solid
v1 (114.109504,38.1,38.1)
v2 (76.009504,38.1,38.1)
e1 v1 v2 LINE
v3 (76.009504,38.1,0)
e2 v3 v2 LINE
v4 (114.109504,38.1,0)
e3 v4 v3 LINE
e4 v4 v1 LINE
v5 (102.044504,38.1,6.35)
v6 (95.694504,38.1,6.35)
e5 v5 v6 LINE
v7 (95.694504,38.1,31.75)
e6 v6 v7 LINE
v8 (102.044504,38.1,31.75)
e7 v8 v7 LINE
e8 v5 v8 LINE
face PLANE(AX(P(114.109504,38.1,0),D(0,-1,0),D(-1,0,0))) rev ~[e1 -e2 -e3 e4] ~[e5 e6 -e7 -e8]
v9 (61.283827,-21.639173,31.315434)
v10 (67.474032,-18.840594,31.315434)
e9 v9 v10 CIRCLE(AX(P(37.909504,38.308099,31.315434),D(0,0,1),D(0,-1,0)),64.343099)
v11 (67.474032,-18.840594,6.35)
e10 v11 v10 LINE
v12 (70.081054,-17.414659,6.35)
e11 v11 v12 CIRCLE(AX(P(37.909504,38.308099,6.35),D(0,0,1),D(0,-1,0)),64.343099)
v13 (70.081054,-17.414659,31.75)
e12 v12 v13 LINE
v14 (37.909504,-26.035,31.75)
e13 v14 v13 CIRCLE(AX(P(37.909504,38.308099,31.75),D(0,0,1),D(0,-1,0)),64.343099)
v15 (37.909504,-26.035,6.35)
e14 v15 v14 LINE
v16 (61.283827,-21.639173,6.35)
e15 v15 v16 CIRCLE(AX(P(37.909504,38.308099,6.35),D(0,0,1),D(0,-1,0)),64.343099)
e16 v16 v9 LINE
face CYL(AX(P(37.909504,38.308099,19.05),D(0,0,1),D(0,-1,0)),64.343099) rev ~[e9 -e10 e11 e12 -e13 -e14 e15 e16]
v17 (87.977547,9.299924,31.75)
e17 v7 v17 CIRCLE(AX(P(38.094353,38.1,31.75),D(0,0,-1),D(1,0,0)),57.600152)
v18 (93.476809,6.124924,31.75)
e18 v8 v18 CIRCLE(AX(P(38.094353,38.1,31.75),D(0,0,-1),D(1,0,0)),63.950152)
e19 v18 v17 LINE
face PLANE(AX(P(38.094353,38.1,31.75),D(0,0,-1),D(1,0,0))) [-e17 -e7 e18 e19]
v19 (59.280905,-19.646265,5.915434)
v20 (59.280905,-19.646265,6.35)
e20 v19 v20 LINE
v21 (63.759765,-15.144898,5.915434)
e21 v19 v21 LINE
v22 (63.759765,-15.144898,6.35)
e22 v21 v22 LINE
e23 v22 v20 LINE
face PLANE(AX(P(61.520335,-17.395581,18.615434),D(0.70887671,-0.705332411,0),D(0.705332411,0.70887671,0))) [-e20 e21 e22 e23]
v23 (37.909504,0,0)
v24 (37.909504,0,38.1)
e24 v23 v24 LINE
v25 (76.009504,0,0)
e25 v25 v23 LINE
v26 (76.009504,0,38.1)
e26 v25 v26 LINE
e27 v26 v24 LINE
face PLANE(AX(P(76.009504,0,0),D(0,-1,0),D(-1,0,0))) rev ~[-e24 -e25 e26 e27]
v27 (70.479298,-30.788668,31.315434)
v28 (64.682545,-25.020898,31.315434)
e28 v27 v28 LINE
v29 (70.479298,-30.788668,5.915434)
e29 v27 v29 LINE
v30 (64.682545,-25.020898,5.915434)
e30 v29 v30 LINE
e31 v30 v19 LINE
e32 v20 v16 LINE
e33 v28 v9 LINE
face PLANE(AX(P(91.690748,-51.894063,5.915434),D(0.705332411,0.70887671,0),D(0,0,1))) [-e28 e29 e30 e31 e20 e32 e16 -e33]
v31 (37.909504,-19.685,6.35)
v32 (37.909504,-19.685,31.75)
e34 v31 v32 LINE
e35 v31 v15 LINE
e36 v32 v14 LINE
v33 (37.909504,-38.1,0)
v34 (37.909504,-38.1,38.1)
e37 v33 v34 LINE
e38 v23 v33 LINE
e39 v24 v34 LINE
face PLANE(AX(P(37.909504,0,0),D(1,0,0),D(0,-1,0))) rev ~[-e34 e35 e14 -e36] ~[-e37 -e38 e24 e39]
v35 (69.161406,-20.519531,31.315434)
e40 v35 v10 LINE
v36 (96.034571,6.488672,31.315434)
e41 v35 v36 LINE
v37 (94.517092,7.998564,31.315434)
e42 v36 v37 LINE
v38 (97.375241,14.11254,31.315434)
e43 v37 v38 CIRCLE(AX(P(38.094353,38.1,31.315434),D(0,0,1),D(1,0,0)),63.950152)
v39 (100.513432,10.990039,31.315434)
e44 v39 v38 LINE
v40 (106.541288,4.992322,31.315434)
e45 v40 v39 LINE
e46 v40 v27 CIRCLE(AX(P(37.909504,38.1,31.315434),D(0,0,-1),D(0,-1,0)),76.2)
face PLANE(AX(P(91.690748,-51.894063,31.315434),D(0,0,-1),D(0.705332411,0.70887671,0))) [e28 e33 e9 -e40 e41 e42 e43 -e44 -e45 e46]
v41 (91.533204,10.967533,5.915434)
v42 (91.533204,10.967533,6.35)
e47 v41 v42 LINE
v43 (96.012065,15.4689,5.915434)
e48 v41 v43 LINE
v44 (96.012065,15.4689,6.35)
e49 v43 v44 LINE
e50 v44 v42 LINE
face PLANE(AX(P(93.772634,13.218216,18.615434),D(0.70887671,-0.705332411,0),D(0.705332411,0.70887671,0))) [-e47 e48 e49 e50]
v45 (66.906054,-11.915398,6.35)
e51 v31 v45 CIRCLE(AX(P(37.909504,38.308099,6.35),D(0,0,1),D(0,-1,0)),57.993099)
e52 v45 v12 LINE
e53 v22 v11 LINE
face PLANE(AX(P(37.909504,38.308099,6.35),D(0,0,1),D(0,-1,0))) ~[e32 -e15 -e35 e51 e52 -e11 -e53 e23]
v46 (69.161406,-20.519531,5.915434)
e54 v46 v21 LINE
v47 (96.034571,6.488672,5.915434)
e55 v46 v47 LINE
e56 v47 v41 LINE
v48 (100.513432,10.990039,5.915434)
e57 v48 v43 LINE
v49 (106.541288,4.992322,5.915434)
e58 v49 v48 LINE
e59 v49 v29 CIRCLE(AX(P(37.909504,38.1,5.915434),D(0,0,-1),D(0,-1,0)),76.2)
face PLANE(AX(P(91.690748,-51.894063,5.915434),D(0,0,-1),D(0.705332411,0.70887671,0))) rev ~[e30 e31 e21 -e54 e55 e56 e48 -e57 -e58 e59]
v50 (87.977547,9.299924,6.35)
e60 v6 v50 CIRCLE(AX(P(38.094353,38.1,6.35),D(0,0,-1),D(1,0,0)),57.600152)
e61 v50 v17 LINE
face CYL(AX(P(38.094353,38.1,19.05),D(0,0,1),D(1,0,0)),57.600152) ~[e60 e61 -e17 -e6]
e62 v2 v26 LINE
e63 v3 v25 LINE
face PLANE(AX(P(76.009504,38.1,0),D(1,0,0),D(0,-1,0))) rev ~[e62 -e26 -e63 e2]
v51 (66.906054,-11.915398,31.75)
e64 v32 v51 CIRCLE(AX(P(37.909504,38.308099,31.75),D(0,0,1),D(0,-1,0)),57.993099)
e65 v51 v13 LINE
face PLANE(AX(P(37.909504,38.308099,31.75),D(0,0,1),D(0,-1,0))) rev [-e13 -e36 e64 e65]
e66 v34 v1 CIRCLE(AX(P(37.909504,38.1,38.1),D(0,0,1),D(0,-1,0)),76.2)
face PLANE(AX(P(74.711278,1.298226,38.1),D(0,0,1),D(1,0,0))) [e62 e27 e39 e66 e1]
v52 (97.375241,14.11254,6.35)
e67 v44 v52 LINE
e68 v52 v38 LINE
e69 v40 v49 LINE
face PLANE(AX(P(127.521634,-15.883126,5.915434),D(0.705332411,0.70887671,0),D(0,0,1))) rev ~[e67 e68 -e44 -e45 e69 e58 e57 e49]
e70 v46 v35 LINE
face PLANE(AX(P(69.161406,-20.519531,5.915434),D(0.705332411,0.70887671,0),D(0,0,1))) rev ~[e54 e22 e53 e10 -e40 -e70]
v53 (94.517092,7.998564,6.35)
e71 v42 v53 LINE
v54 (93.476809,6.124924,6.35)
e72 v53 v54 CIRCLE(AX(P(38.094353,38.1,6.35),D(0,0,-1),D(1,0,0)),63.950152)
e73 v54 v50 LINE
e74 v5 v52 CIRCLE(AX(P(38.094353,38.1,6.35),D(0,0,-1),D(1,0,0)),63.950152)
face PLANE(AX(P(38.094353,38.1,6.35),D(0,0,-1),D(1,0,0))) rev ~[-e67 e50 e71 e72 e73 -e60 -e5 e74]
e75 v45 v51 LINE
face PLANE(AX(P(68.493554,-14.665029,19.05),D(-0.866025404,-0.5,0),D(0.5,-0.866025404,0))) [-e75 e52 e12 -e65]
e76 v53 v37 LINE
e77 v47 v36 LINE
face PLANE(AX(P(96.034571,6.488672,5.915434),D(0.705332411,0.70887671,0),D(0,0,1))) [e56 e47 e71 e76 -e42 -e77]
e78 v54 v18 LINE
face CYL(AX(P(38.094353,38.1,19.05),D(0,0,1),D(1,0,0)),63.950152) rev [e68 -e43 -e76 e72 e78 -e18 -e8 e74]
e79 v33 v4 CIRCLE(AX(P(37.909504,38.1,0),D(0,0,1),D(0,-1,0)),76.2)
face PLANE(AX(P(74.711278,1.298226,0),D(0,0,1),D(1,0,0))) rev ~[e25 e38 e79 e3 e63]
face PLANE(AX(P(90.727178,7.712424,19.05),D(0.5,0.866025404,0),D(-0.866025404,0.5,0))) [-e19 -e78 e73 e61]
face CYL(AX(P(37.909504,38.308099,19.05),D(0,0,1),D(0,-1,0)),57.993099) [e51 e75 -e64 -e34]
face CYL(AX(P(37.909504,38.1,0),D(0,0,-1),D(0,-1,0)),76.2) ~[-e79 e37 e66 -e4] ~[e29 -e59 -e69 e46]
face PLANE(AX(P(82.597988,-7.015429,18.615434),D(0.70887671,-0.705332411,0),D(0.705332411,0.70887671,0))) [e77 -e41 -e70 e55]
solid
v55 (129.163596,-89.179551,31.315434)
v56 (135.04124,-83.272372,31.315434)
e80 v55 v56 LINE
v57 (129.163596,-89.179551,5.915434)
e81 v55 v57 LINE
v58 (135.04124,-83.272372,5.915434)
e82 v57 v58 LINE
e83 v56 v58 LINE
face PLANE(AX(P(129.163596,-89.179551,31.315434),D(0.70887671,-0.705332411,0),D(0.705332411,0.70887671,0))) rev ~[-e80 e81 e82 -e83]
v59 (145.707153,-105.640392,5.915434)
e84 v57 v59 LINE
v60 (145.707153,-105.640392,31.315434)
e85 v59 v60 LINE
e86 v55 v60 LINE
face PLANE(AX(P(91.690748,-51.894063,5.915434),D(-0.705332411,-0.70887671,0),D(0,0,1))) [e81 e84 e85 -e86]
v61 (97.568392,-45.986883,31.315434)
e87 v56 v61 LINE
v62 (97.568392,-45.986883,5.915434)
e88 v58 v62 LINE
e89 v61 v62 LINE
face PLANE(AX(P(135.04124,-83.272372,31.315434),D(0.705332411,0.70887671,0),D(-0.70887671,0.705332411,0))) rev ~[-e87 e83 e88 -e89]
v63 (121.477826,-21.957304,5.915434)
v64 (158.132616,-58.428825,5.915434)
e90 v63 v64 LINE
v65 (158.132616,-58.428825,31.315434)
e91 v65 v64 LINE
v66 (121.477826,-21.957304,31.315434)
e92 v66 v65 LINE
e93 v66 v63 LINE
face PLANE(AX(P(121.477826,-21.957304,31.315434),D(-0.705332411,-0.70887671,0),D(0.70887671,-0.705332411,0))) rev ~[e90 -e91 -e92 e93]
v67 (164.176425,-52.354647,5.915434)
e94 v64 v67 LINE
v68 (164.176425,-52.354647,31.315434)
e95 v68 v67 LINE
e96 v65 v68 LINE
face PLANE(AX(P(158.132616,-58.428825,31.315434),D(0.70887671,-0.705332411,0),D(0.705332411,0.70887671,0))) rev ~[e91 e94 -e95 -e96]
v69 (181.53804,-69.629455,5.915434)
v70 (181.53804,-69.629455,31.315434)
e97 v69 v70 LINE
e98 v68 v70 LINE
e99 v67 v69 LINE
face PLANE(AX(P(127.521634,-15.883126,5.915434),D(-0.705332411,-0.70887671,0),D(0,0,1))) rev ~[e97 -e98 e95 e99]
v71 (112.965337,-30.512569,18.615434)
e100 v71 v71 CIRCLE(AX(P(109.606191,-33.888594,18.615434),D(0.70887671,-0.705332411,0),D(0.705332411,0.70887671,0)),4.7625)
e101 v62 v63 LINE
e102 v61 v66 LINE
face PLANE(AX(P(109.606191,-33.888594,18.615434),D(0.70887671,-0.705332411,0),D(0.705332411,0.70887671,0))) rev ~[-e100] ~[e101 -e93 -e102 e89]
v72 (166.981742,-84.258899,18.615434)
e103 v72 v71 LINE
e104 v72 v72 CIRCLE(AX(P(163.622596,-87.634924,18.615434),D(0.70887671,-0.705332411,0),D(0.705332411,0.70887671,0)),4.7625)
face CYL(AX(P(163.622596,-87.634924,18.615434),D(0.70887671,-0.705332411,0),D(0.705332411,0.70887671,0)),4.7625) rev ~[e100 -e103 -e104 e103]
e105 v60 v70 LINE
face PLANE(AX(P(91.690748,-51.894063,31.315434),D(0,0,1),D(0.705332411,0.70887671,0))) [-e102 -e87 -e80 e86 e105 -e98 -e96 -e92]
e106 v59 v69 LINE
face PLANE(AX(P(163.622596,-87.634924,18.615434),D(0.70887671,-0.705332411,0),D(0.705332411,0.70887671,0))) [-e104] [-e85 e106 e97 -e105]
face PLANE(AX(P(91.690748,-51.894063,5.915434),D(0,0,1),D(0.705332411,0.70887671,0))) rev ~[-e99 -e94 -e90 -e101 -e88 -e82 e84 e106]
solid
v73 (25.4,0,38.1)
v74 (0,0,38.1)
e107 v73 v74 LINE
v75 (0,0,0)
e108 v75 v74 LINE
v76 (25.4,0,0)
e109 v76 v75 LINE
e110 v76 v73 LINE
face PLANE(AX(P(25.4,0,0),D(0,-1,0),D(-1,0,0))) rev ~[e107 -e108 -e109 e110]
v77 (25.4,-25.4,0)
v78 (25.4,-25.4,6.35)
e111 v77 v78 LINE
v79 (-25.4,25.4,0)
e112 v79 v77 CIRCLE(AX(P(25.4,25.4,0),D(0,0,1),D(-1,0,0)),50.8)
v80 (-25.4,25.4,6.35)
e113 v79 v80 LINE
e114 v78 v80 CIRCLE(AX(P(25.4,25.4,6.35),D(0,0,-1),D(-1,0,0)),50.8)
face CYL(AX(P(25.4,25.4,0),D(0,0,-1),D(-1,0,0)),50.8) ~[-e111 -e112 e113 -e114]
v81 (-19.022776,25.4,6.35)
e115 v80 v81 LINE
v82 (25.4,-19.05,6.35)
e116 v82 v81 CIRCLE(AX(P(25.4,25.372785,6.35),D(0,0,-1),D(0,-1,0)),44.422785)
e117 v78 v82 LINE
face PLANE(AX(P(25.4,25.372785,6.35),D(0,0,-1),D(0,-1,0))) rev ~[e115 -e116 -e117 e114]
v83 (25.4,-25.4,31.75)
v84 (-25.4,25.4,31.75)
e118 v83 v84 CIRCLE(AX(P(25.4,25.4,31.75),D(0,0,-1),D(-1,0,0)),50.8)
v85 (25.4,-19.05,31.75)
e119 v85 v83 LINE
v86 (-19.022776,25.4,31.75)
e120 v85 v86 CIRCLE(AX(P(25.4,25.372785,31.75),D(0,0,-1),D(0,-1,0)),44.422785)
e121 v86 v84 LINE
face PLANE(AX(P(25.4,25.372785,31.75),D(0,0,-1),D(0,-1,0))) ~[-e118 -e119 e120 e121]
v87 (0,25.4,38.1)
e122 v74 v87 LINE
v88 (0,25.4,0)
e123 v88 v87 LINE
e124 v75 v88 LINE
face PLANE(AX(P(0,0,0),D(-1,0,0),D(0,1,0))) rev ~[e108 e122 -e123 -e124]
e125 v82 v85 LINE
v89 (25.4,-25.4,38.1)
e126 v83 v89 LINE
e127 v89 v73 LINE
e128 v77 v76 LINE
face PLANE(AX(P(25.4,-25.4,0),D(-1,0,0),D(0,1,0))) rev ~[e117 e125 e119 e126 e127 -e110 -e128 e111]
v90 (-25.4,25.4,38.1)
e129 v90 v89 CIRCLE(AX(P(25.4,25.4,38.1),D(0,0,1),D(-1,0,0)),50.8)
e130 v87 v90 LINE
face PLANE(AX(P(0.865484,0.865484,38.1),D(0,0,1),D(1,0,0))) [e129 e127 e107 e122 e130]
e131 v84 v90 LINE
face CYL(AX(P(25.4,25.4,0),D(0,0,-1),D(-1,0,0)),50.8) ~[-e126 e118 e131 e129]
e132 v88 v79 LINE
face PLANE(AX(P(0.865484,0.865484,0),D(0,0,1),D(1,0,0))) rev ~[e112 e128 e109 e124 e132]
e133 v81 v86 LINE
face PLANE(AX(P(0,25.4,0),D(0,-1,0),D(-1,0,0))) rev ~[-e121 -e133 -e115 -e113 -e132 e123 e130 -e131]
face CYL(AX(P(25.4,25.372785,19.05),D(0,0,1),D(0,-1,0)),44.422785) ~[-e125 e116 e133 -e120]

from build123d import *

# Parameters (mm, degrees)
F1_DEPTH  = 38.1
F2_W      = 6.35
F2_H      = 25.4
F3_ANGLE  = 91
F5_DEPTH  = 38.1
F6_W      = 6.35
F6_H      = 25.4
F7_ANGLE  = 30
F11_W     = 50.8
F11_H     = 25.4
F12_DEPTH = 38.1
F8_W      = 6.35
F8_H      = 25.4
F13_ANGLE = 30
F14_W     = 6.35
F14_H     = 25.4
F15_DEPTH = 7.62
F16_W     = 6.35
F16_H     = 25.4
F17_DEPTH = 6.35
F18_DEPTH = 76.2
F19_R     = 4.7625
F20_DEPTH = 76.2
F22_DEPTH = 25.4


# Not quite as in the source:
# - a feature names something its author has since deleted; it is built from what else it names


with BuildPart() as f1:
    # F0 (on Top) → F1 (new body)
    with BuildSketch(Plane.XY):
        with BuildLine():
            Line((0, 25.4), (-25.4, 25.4))
            ThreePointArc((-25.4, 25.4), (-10.5210244843, -10.5210244843), (25.4, -25.4))
            Line((25.4, -25.4), (25.4, 0))
            Line((25.4, 0), (0, 0))
            Line((0, 0), (0, 25.4))
        make_face()
    extrude(amount=F1_DEPTH)

    # F2 (on face) → F3 (revolve, cut)
    with BuildSketch(Plane.YZ.offset(25.4)):
        with Locations((-28.575, 19.05)):
            Rectangle(F2_W, F2_H)
        with Locations((-22.225, 19.05)):
            Rectangle(F2_W, F2_H)
    revolve(axis=Axis((25.4, 25.3727845848, 25.4265852273), (0, 0, -1)), revolution_arc=F3_ANGLE, mode=Mode.SUBTRACT)


with BuildPart() as f5:
    # F4 (on Top) → F5 (new body)
    with BuildSketch(Plane.XY):
        with BuildLine():
            Line((114.1095044971, 38.1), (76.0095044971, 38.1))
            Line((76.0095044971, 38.1), (76.0095044971, 0))
            Line((76.0095044971, 0), (37.9095044971, 0))
            Line((37.9095044971, 0), (37.9095044971, -38.1))
            ThreePointArc((37.9095044971, -38.1), (91.7910412235, -15.7815367264), (114.1095044971, 38.1))
        make_face()
    extrude(amount=F5_DEPTH)

    # F6 (on face) → F7 (revolve, cut)
    with BuildSketch(Plane(origin=(37.9095044971, 0, 0), x_dir=(0, -1, 0), z_dir=(-1, 0, 0))):
        with Locations((22.86, 19.05)):
            Rectangle(F6_W, F6_H)
    revolve(axis=Axis((37.9095044971, 38.3080989122, 33.1992767751), (0, 0, 1)), revolution_arc=F7_ANGLE, mode=Mode.SUBTRACT)

    # F11 (on face) → F12 (cut)
    with BuildSketch(Plane(origin=(72.0218737811, -71.6617729132, 0), x_dir=(0.7053324106, 0.7088767104, 0), z_dir=(0.7088767104, -0.7053324106, 0))):
        with Locations((53.2859638333, 18.6154339463)):
            Rectangle(F11_W, F11_H)
    extrude(amount=-F12_DEPTH, mode=Mode.SUBTRACT)

    # F8 (on face) → F13 (revolve, cut)
    with BuildSketch(Plane(origin=(0, 38.1, 0), x_dir=(-1, 0, 0), z_dir=(0, 1, 0))):
        with Locations((-98.8695044971, 19.05)):
            Rectangle(F8_W, F8_H)
    revolve(axis=Axis((38.0943529308, 38.1, 28.2714888453), (0, 0, -1)), revolution_arc=F13_ANGLE, mode=Mode.SUBTRACT)

    # F14 (on face) → F15 (cut)
    with BuildSketch(Plane(origin=(45.0136711132, -44.7886080707, 0), x_dir=(0.7053324106, 0.7088767104, 0), z_dir=(0.7088767104, -0.7053324106, 0))):
        with Locations((31.0609638333, 18.6154339463)):
            Rectangle(F14_W, F14_H)
    extrude(amount=-F15_DEPTH, mode=Mode.SUBTRACT)

    # F16 (on face) → F17 (cut)
    with BuildSketch(Plane(origin=(45.0136711132, -44.7886080707, 0), x_dir=(0.7053324106, 0.7088767104, 0), z_dir=(0.7088767104, -0.7053324106, 0))):
        with Locations((75.5109638333, 18.6154339463)):
            Rectangle(F16_W, F16_H)
    extrude(amount=-F17_DEPTH, mode=Mode.SUBTRACT)


with BuildPart() as f18:
    # F11 (on face) → F18 (new body)
    with BuildSketch(Plane(origin=(72.0218737811, -71.6617729132, 0), x_dir=(0.7053324106, 0.7088767104, 0), z_dir=(0.7088767104, -0.7053324106, 0))):
        with Locations((53.2859638333, 18.6154339463)):
            Rectangle(F11_W, F11_H)
    extrude(amount=F18_DEPTH)

    # F19 (on face) → F20 (cut)
    with BuildSketch(Plane(origin=(126.038279117, -125.408102598, 0), x_dir=(0.7053324106, 0.7088767104, 0), z_dir=(0.7088767104, -0.7053324106, 0))):
        with Locations((53.2859638333, 18.6154339463)):
            Circle(F19_R)
    extrude(amount=-F20_DEPTH, mode=Mode.SUBTRACT)

    # F21 (on face) → F22 (cut)
    with BuildSketch(Plane.XY.offset(31.3154339463)):
        Polygon((135.04124021, -83.2723715078), (97.5683920804, -45.9868831958), (91.6907478725, -51.8940626034), (129.1635960022, -89.1795509154), align=None)
        Polygon((127.5216343291, -15.8831257129), (121.4778258094, -21.9573044091), (158.1326163355, -58.428825309), (164.1764248552, -52.3546466128), align=None)
    extrude(amount=-F22_DEPTH, mode=Mode.SUBTRACT)


solid = Compound([f1.part, f5.part, f18.part])
